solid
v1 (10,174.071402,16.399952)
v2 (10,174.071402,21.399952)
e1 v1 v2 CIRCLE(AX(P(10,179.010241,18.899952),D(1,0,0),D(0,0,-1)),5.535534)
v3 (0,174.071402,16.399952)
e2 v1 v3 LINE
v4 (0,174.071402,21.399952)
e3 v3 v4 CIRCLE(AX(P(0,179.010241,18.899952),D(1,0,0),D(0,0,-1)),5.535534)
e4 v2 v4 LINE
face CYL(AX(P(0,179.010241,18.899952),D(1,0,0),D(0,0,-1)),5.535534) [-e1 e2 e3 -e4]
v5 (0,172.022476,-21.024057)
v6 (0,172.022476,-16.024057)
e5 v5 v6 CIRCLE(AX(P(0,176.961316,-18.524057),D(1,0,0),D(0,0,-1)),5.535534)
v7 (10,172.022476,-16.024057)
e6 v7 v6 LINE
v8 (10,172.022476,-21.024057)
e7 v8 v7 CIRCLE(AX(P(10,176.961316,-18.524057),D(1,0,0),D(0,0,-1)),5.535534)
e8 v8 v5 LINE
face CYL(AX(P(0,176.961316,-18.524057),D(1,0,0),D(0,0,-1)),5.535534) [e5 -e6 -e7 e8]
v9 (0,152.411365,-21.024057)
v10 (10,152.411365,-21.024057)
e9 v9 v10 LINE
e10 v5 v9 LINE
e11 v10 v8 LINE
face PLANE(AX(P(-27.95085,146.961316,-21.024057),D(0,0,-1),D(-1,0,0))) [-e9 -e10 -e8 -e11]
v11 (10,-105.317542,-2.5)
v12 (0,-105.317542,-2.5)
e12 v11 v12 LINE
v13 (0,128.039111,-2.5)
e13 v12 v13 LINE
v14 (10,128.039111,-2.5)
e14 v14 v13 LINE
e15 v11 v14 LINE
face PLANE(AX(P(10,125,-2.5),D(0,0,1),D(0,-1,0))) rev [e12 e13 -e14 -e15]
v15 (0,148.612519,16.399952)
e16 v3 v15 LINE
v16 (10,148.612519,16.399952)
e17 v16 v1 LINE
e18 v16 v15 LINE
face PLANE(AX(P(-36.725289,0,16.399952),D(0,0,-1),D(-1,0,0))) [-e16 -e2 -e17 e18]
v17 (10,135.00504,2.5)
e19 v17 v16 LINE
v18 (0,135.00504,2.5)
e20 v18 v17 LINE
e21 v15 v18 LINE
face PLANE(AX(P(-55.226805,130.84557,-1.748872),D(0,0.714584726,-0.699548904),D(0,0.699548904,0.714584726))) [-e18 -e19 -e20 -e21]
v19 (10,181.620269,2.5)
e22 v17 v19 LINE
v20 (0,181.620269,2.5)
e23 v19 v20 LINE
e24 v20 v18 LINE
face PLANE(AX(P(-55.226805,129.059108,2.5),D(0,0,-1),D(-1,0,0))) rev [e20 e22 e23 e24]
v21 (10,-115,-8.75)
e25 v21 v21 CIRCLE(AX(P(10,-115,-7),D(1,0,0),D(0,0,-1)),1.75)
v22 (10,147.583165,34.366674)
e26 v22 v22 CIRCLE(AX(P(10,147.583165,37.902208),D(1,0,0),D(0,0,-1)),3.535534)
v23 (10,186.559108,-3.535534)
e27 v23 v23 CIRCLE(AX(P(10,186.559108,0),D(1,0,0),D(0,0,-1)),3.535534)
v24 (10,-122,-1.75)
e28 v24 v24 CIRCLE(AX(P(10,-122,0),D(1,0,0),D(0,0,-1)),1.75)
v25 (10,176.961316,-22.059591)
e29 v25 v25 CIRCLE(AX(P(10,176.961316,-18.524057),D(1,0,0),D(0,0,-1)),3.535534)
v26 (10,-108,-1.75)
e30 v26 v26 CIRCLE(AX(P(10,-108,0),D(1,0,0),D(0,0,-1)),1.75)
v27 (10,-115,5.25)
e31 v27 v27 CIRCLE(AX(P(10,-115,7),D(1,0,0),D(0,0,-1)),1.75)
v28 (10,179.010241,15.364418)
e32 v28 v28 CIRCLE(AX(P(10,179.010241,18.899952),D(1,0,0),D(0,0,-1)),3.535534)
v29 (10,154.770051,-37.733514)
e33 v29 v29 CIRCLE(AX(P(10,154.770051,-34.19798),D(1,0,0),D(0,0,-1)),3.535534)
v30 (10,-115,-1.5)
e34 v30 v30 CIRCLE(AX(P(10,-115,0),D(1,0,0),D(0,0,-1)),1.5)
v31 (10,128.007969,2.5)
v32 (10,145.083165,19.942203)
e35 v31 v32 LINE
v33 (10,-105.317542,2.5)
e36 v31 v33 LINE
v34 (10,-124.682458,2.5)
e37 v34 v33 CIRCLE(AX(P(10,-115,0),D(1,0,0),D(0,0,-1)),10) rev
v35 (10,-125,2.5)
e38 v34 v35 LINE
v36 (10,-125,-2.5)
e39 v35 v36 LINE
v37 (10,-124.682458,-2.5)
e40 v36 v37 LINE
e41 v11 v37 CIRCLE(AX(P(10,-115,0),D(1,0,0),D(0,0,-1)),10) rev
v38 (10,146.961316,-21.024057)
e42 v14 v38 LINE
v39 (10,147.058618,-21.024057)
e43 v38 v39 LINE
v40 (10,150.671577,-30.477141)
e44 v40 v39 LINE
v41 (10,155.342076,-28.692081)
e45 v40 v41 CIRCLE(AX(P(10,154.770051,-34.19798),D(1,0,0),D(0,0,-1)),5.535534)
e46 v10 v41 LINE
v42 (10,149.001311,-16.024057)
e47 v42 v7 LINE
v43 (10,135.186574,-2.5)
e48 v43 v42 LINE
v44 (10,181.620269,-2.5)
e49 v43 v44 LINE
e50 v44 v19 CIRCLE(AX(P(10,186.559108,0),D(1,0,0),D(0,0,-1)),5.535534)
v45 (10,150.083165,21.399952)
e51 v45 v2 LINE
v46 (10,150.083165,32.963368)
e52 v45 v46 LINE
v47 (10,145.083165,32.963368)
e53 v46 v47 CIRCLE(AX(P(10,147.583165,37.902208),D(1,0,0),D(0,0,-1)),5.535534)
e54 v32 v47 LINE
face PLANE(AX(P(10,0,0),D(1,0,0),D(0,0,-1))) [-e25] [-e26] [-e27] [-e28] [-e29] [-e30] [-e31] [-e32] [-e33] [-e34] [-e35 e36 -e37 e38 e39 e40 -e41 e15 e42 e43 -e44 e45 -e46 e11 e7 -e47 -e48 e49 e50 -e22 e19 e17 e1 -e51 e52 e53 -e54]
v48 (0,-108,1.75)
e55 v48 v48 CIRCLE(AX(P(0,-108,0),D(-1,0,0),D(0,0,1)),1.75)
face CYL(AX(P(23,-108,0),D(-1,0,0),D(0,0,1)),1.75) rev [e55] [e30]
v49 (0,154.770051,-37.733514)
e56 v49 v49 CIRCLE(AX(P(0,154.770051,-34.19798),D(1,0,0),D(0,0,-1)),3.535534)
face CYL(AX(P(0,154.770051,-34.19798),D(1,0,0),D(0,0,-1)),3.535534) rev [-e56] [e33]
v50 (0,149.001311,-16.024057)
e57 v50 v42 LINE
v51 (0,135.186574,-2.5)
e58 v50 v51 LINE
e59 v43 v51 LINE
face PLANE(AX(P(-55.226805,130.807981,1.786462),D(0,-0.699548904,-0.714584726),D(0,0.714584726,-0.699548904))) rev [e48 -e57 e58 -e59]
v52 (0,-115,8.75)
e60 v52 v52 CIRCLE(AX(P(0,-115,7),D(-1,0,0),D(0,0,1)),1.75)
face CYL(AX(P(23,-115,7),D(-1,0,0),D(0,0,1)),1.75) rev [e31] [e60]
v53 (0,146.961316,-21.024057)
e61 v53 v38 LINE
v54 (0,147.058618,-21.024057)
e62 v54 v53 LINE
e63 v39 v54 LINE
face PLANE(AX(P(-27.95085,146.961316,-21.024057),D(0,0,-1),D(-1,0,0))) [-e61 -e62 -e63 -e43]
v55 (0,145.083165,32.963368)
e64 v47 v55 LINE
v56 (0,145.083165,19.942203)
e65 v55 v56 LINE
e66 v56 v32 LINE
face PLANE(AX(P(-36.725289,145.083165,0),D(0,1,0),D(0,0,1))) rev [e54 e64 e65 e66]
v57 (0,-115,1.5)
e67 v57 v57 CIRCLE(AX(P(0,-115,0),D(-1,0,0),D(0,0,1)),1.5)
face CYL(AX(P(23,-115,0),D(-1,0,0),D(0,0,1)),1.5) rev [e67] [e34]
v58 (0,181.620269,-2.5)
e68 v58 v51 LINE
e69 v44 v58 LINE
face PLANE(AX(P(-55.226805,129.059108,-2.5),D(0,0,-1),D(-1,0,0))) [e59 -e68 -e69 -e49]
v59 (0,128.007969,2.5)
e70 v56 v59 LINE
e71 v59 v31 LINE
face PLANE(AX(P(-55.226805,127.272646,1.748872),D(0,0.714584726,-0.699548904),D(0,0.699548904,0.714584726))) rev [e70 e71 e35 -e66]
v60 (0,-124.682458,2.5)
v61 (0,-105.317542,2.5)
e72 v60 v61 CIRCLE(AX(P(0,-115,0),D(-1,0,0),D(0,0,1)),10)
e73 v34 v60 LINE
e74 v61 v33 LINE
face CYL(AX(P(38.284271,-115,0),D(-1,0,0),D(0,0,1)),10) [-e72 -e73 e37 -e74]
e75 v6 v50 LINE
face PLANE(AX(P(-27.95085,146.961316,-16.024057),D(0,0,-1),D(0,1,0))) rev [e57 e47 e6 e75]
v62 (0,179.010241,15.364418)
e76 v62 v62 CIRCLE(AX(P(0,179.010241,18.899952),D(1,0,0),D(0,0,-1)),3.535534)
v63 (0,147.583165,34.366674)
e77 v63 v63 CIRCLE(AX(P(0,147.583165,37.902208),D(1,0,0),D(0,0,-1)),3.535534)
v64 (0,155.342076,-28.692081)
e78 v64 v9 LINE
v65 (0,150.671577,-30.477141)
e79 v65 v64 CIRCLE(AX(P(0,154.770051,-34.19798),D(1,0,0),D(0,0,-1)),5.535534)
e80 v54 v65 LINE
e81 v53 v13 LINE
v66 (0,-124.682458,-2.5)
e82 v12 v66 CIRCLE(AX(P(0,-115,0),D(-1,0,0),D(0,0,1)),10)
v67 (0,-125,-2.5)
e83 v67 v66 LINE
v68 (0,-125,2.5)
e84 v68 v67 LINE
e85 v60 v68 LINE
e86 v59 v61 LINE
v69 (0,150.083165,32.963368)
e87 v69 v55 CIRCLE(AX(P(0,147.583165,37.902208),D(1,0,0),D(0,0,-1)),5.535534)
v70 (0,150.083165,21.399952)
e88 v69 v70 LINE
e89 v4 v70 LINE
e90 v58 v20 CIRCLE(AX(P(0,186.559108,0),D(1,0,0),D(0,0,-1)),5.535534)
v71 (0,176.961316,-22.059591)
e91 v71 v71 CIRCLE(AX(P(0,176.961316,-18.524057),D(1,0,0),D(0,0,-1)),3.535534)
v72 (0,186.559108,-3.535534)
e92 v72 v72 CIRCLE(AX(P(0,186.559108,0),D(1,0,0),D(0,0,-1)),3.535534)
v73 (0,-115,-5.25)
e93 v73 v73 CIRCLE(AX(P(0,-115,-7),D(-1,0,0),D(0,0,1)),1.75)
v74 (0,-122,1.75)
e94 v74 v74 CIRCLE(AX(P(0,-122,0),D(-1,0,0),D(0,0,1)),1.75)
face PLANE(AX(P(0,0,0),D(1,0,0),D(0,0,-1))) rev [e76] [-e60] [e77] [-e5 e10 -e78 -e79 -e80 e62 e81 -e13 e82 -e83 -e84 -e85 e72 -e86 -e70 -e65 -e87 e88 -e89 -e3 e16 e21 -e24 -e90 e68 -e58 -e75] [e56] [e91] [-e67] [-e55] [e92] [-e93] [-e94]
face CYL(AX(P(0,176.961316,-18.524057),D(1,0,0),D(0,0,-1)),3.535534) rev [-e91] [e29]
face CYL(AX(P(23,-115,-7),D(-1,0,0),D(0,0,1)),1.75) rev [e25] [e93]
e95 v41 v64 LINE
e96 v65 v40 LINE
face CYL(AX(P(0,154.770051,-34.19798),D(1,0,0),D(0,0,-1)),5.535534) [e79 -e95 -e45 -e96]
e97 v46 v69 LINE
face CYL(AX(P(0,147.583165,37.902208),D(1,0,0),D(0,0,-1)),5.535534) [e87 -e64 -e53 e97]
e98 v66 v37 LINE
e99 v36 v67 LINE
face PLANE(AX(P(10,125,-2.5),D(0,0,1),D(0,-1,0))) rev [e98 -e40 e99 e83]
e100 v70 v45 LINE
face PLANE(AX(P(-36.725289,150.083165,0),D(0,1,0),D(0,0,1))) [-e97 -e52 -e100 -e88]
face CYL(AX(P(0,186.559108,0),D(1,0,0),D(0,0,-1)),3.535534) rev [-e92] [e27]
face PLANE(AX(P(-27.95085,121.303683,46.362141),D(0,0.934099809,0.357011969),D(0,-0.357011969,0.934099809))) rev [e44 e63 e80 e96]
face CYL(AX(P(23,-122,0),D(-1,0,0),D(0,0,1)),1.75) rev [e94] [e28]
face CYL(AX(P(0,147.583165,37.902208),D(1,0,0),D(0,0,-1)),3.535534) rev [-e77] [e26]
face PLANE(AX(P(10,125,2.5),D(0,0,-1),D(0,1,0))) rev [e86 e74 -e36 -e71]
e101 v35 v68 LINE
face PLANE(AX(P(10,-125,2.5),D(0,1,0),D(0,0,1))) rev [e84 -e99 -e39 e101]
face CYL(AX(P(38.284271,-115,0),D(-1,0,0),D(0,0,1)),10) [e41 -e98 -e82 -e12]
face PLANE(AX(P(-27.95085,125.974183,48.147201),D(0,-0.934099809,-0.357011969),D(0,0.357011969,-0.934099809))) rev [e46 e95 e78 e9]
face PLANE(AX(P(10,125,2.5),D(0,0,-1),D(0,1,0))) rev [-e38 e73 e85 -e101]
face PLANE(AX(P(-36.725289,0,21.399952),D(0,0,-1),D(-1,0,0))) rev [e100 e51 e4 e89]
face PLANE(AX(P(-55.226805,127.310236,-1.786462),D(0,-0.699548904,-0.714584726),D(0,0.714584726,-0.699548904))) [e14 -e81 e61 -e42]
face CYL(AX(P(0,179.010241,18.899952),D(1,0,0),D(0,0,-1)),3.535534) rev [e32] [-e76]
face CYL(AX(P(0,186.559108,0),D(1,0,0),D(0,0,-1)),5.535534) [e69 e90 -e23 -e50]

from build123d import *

# Parameters (mm, degrees)
SKETCH1_W           = 5
SKETCH1_H           = 250
BOSS_EXTRUDE1_DEPTH = 10
SKETCH3_R           = 10
BOSS_EXTRUDE2_DEPTH = 10
SKETCH4_R           = 1.5
SKETCH4_R_2         = 1.75
CUT_EXTRUDE1_DEPTH  = 23
EXTRUDE_THIN5_START = -10
EXTRUDE_THIN5_DEPTH = 10
SKETCH10_W          = 5
SKETCH10_H          = 27.5
BOSS_EXTRUDE3_DEPTH = 10
BOSS_EXTRUDE4_DEPTH = 10
SKETCH12_R          = 5.535533906
SKETCH12_R_2        = 3.535533906
EXTRUDE_THIN6_DEPTH = 10
SKETCH14_R          = 3.535533906
CUT_EXTRUDE2_DEPTH  = 10


# Read off the part's stored shape, not the designer's step: Extrude-Thin5
with BuildPart() as part:
    # Sketch1 → Boss-Extrude1 (new body)
    with BuildSketch(Plane(origin=(0, 0, 0), x_dir=(0, 0, -1), z_dir=(1, 0, 0))):
        Rectangle(SKETCH1_W, SKETCH1_H)
    extrude(amount=BOSS_EXTRUDE1_DEPTH)

    # Sketch3 → Boss-Extrude2 (add)
    with BuildSketch(Plane.ZY):
        with Locations((0, -115)):
            Circle(SKETCH3_R)
    extrude(amount=-BOSS_EXTRUDE2_DEPTH)

    # Sketch4 → Cut-Extrude1 (cut)
    with BuildSketch(Plane.ZY):
        with Locations((0, -115)):
            Circle(SKETCH4_R)
        with Locations((-7, -115)):
            Circle(SKETCH4_R_2)
        with Locations((0, -108)):
            Circle(SKETCH4_R_2)
        with Locations((7, -115)):
            Circle(SKETCH4_R_2)
        with Locations((0, -122)):
            Circle(SKETCH4_R_2)
    extrude(amount=-CUT_EXTRUDE1_DEPTH, mode=Mode.SUBTRACT)

    # Extrude-Thin5 outline → Extrude-Thin5 (add)
    with BuildSketch(Plane(origin=(10, 0, 0), x_dir=(0, 0, -1), z_dir=(1, 0, 0)).offset(EXTRUDE_THIN5_START)):
        Polygon((17.451133042, 150.459060521), (2.5, 135.186573848), (2.5, 184.059108288), (-2.5, 184.059108288), (-2.5, 135.005040385), (-17.902207713, 150.083164962), (-21.399952233, 146.51024133), (-2.5, 128.007969476), (-2.5, 125), (2.5, 125), (2.5, 128.039110715), (21.024056673, 146.961316001), align=None)
    extrude(amount=EXTRUDE_THIN5_DEPTH)

    # Sketch10 → Boss-Extrude3 (add)
    with BuildSketch(Plane(origin=(10, 0, 0), x_dir=(0, 0, -1), z_dir=(1, 0, 0))):
        with Locations((18.524056673, 160.711316001)):
            Rectangle(SKETCH10_W, SKETCH10_H)
        Polygon((30.970200678, 156.21277045), (32.755260524, 151.542271403), (18.743763382, 146.187091867), (16.958703537, 150.857590914), align=None)
    extrude(amount=-BOSS_EXTRUDE3_DEPTH)

    # Sketch11 → Boss-Extrude4 (add)
    with BuildSketch(Plane(origin=(10, 0, 0), x_dir=(0, 0, -1), z_dir=(1, 0, 0))):
        Polygon((-21.399952233, 176.51024133), (-21.399952233, 150.083164962), (-17.902207713, 150.083164962), (-16.399952233, 148.612518954), (-16.399952233, 176.51024133), align=None)
        Polygon((-17.902207713, 150.083164962), (-21.399952233, 146.51024133), (-17.902207713, 146.51024133), align=None)
        Polygon((-21.399952233, 150.083164962), (-21.399952233, 146.51024133), (-17.902207713, 150.083164962), align=None)
        Polygon((-17.902207713, 150.083164962), (-17.902207713, 146.51024133), (-16.399952233, 146.51024133), (-16.399952233, 148.612518954), align=None)
        Polygon((-19.942202859, 145.083164962), (-21.399952233, 146.51024133), (-21.399952233, 150.083164962), (-35.402207713, 150.083164962), (-35.402207713, 145.083164962), align=None)
        Polygon((-17.902207713, 146.51024133), (-21.399952233, 146.51024133), (-19.942202859, 145.083164962), (-17.902207713, 145.083164962), align=None)
    extrude(amount=-BOSS_EXTRUDE4_DEPTH)

    # Sketch12 → Extrude-Thin6 (add)
    # profile 1 of 5: a face of its own
    with BuildSketch(Plane(origin=(10, 0, 0), x_dir=(0, 0, -1), z_dir=(1, 0, 0))):
        with Locations((-18.899952233, 179.01024133)):
            Circle(SKETCH12_R)
        with Locations((-18.899952233, 179.01024133)):
            Circle(SKETCH12_R_2, mode=Mode.SUBTRACT)
    # profile 2 of 5: a face of its own
    with BuildSketch(Plane(origin=(10, 0, 0), x_dir=(0, 0, -1), z_dir=(1, 0, 0))):
        with Locations((0, 186.559108288)):
            Circle(SKETCH12_R)
        with Locations((0, 186.559108288)):
            Circle(SKETCH12_R_2, mode=Mode.SUBTRACT)
    # profile 3 of 5: a face of its own
    with BuildSketch(Plane(origin=(10, 0, 0), x_dir=(0, 0, -1), z_dir=(1, 0, 0))):
        with Locations((18.524056673, 176.961316001)):
            Circle(SKETCH12_R)
        with Locations((18.524056673, 176.961316001)):
            Circle(SKETCH12_R_2, mode=Mode.SUBTRACT)
    # profile 4 of 5: a face of its own
    with BuildSketch(Plane(origin=(10, 0, 0), x_dir=(0, 0, -1), z_dir=(1, 0, 0))):
        with Locations((34.197980125, 154.770050849)):
            Circle(SKETCH12_R)
        with Locations((34.197980125, 154.770050849)):
            Circle(SKETCH12_R_2, mode=Mode.SUBTRACT)
    # profile 5 of 5: a face of its own
    with BuildSketch(Plane(origin=(10, 0, 0), x_dir=(0, 0, -1), z_dir=(1, 0, 0))):
        with Locations((-37.902207713, 147.583164962)):
            Circle(SKETCH12_R)
        with Locations((-37.902207713, 147.583164962)):
            Circle(SKETCH12_R_2, mode=Mode.SUBTRACT)
    extrude(amount=-EXTRUDE_THIN6_DEPTH)

    # Sketch14 → Cut-Extrude2 (cut)
    with BuildSketch(Plane(origin=(10, 0, 0), x_dir=(0, 0, -1), z_dir=(1, 0, 0))):
        with Locations((-37.902207713, 147.583164962)):
            Circle(SKETCH14_R)
        with Locations((-18.899952233, 179.01024133)):
            Circle(SKETCH14_R)
        with Locations((0, 186.559108288)):
            Circle(SKETCH14_R)
        with Locations((18.524056673, 176.961316001)):
            Circle(SKETCH14_R)
        with Locations((34.197980125, 154.770050849)):
            Circle(SKETCH14_R)
    extrude(amount=-CUT_EXTRUDE2_DEPTH, mode=Mode.SUBTRACT)


solid = part.part
